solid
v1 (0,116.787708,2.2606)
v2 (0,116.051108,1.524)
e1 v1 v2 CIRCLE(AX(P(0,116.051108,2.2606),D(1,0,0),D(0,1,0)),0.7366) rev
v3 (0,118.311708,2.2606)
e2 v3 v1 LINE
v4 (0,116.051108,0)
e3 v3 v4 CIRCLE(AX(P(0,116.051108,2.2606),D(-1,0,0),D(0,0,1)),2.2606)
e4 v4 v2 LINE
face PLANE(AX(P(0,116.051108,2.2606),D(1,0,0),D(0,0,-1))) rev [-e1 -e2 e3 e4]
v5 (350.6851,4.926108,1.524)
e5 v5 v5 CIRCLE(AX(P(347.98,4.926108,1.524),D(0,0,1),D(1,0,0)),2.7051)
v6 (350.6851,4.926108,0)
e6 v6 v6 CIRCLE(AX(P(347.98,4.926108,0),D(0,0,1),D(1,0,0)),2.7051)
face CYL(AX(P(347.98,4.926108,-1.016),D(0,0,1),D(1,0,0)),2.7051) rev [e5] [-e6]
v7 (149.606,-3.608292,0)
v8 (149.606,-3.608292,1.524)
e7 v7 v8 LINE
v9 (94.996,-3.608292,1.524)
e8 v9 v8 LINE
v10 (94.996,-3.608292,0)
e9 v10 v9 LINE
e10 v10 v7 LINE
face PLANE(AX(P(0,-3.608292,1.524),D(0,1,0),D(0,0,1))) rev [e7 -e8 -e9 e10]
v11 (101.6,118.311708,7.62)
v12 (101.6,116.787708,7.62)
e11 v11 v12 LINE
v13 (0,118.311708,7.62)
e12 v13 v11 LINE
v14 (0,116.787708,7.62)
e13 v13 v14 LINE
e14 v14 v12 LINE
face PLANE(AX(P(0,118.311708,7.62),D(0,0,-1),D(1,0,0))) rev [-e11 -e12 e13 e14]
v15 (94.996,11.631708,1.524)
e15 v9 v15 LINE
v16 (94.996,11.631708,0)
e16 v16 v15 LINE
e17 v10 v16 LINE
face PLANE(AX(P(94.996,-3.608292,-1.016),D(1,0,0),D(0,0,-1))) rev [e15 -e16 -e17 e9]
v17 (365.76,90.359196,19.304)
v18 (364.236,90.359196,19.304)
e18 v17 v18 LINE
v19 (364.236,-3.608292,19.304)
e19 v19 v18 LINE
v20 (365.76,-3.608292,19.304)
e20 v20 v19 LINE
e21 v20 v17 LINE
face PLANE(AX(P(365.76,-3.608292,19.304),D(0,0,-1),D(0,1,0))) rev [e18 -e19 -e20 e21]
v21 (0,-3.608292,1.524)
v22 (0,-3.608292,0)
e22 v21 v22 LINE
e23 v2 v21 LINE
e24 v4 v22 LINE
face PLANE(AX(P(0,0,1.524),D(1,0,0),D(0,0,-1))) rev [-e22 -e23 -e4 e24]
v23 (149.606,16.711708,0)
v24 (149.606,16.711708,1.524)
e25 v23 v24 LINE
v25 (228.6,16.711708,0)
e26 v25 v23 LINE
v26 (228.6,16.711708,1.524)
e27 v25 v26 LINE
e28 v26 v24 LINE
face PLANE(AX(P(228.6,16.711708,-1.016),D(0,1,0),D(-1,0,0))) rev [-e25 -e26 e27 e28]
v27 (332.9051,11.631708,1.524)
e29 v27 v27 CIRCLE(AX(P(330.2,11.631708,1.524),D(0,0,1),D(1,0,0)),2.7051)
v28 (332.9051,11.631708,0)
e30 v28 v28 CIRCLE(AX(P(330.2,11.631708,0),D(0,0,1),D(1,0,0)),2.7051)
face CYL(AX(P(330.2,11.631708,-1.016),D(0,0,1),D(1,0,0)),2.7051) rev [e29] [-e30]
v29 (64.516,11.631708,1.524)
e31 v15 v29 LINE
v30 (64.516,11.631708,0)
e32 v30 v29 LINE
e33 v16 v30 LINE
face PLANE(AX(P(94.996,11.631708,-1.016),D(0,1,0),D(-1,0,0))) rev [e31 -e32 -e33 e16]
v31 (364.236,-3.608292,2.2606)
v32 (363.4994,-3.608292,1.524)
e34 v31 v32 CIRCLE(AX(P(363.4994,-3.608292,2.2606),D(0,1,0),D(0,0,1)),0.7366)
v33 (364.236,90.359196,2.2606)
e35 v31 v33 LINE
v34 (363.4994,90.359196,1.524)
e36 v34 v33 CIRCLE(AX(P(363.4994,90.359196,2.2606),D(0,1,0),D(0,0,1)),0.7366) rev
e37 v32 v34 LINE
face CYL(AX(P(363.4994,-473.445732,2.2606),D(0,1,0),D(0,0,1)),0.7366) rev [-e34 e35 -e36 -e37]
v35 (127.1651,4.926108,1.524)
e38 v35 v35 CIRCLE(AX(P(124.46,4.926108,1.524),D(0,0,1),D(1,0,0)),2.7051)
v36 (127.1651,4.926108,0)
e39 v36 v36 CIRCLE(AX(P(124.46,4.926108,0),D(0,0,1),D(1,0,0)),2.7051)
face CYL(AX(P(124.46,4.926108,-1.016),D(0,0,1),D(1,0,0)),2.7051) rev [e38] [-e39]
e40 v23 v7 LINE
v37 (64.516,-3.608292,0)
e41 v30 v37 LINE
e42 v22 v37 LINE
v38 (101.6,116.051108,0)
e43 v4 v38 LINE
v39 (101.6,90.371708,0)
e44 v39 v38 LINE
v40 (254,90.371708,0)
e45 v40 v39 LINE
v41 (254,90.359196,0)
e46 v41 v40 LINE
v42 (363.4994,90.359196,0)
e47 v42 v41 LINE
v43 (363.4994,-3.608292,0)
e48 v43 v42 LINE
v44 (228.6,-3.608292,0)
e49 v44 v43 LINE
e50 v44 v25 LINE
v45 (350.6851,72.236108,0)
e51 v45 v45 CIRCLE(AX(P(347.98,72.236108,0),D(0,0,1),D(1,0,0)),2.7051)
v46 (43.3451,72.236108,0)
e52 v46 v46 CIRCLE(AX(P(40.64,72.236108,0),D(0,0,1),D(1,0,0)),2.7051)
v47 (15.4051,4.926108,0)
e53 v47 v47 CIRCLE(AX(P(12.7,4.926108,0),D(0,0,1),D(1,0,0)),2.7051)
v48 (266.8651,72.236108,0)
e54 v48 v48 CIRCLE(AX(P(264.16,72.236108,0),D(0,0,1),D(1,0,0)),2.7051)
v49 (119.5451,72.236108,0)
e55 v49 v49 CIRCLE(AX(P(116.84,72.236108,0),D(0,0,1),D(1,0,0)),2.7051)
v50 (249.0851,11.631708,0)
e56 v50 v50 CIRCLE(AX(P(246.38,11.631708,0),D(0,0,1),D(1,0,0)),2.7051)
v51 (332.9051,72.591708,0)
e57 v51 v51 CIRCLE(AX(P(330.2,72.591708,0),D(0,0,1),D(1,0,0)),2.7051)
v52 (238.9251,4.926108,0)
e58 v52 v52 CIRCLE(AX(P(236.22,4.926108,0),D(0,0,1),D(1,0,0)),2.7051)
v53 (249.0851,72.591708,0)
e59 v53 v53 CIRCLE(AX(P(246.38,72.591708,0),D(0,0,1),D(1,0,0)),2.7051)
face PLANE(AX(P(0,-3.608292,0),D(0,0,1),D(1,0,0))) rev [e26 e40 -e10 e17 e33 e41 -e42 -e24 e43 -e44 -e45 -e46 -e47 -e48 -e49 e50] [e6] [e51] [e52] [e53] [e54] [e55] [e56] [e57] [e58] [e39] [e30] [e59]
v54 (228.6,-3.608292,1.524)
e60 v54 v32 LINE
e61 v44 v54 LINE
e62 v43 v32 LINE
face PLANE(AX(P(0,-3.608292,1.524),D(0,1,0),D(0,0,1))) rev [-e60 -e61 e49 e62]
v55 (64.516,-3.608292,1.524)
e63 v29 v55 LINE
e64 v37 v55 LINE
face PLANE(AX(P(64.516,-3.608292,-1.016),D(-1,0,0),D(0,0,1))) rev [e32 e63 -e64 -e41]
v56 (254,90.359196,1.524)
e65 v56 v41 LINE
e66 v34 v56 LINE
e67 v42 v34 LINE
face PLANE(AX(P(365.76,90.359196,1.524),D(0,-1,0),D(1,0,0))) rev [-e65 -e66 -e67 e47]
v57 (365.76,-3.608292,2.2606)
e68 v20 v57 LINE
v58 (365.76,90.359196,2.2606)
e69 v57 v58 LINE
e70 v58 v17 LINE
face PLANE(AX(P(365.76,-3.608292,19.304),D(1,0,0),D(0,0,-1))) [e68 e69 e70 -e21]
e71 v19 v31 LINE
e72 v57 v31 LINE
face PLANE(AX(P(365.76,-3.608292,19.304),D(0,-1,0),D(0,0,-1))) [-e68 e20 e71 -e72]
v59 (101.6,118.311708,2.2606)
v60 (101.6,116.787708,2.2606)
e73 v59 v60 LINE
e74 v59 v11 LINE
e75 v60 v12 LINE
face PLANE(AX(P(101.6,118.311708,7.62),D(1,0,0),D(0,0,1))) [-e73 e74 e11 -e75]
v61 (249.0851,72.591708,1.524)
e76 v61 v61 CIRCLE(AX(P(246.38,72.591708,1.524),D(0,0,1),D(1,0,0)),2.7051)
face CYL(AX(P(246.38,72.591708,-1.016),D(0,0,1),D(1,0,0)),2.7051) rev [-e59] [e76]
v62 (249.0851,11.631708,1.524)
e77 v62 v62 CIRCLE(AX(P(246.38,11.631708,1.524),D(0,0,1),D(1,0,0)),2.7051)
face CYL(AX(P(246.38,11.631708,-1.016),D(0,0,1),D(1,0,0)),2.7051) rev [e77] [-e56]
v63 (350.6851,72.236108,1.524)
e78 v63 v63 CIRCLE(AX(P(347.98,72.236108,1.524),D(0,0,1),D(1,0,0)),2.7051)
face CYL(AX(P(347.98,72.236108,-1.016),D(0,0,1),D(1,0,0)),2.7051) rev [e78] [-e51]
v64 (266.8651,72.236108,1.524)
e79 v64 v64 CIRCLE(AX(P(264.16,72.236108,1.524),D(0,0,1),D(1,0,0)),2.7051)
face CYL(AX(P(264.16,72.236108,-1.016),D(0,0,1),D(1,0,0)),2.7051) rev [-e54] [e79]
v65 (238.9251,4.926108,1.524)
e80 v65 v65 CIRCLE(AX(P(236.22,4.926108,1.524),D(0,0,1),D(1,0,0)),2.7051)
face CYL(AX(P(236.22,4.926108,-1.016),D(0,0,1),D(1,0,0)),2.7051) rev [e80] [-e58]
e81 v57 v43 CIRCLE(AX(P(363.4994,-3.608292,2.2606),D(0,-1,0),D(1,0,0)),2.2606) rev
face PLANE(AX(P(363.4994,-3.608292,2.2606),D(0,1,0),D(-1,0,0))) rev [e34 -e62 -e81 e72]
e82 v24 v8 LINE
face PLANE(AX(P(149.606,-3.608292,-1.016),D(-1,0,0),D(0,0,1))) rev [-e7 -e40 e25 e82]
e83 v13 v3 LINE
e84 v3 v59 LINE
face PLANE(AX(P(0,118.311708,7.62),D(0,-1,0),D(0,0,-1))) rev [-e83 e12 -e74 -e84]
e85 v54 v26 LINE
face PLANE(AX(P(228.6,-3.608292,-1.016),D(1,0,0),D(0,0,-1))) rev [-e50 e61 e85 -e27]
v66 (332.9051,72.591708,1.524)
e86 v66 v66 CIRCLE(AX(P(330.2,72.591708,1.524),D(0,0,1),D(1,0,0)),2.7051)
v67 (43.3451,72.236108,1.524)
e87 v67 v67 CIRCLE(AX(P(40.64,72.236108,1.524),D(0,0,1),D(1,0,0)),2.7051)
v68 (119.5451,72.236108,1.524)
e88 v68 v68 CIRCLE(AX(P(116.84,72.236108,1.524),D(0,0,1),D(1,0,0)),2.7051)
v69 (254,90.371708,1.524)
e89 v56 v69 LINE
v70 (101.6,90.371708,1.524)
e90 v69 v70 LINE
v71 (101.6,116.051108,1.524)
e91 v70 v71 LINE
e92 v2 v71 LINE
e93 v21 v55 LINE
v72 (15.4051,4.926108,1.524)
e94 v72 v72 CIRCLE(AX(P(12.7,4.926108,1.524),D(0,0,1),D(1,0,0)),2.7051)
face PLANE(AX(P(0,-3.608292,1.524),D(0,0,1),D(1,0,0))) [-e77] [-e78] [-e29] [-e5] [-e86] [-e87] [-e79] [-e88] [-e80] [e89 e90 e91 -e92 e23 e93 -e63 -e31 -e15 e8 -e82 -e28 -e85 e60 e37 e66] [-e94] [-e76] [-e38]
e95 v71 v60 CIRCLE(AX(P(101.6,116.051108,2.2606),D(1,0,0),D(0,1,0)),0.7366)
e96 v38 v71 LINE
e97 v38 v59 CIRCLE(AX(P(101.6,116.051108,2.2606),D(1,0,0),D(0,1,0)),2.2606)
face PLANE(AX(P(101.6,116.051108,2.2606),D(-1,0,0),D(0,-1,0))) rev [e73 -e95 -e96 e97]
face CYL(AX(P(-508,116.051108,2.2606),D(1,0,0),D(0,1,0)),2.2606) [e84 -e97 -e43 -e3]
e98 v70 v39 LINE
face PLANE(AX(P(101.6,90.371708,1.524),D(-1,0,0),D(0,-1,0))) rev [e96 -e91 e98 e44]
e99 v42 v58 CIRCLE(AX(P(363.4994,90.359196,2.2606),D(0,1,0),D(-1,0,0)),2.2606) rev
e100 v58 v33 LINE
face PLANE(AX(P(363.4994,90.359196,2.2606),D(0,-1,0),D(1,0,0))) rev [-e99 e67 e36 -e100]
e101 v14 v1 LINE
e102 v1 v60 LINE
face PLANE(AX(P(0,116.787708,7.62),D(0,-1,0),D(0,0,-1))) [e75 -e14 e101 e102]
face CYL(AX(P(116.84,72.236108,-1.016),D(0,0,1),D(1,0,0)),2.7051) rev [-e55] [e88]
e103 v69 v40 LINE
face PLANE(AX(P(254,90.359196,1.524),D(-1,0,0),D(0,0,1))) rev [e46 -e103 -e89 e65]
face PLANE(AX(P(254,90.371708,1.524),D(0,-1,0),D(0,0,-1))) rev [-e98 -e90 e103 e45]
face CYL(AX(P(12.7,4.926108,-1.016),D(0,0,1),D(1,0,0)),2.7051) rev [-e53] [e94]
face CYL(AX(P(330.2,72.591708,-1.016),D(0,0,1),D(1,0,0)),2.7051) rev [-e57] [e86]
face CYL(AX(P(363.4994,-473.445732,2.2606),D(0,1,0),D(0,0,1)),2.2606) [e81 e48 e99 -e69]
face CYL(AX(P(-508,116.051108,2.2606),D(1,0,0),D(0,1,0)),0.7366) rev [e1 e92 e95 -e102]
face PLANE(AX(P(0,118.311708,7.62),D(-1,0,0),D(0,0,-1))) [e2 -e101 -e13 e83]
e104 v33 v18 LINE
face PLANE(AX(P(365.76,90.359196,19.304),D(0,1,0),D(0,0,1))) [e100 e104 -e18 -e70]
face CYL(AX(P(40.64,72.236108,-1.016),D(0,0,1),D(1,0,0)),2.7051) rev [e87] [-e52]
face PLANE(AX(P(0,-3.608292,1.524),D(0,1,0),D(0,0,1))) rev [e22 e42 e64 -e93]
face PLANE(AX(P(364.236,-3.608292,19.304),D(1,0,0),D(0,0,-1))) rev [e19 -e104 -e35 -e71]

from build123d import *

# Parameters (mm, degrees)
BASE_FLANGE1_DEPTH    = 1.524
MITER_START           = -3.608291964
MITER_FLANGE1_DEPTH   = 93.967487941
MITER_FLANGE1_2_DEPTH = 93.967487941
MITER_FLANGE2_DEPTH   = 101.6
MITER_FLANGE2_2_DEPTH = 101.6
SKETCH6_R             = 2.7051
PCB_MOUNT_HOLES_DEPTH = 2.54
SKETCH7_W             = 78.994
SKETCH7_H             = 20.32
SKETCH7_W_2           = 30.48
SKETCH7_H_2           = 15.24
CUT_EXTRUDE2_DEPTH    = 2.54
SKETCH8_R             = 2.7051
CUT_EXTRUDE3_DEPTH    = 2.54
LPATTERN1_COUNT       = 2
LPATTERN1_PITCH       = 83.82
LPATTERN1_COUNT_DIR2  = 2
LPATTERN1_PITCH_DIR2  = 60.96


# Read off the part's stored shape, not the designer's step: Miter Flange1, Miter Flange2
# Sheet-metal steps are written as plain solids
with BuildPart() as part:
    # Sketch1 → Base-Flange1 (new body)
    with BuildSketch(Plane.XY):
        Polygon((0, 0), (0, -3.608291964), (365.76, -3.608291964), (365.76, 90.359195977), (254, 90.359195977), (254, 90.371708036), (101.6, 90.371708036), (101.6, 118.311708036), (0, 118.311708036), align=None)
    extrude(amount=BASE_FLANGE1_DEPTH)

    # Miter Flange1 outline → Miter Flange1 (cut)
    with BuildSketch(Plane(origin=(0, 0, 0), x_dir=(1, 0, 0), z_dir=(0, 1, 0)).offset(MITER_START)):
        with BuildLine():
            ThreePointArc((363.4994, 0), (364.811869886, -0.420019885), (365.636625492, -1.524))
            Line((365.636625492, -1.524), (365.76, -1.524))
            Line((365.76, -1.524), (365.76, 0))
            Line((365.76, 0), (363.4994, 0))
        make_face()
    extrude(amount=MITER_FLANGE1_DEPTH, mode=Mode.SUBTRACT)

    # Miter Flange1 2 outline → Miter Flange1 2 (add)
    with BuildSketch(Plane(origin=(0, 0, 0), x_dir=(1, 0, 0), z_dir=(0, 1, 0)).offset(MITER_START)):
        with BuildLine():
            Line((364.236, -19.304), (365.76, -19.304))
            Line((365.76, -19.304), (365.76, -2.2606))
            ThreePointArc((365.76, -2.2606), (365.728943037, -1.887169675), (365.636625492, -1.524))
            Line((365.636625492, -1.524), (363.4994, -1.524))
            ThreePointArc((363.4994, -1.524), (364.020254855, -1.739745145), (364.236, -2.2606))
            Line((364.236, -2.2606), (364.236, -19.304))
        make_face()
    extrude(amount=MITER_FLANGE1_2_DEPTH)

    # Miter Flange2 outline → Miter Flange2 (cut)
    with BuildSketch(Plane.YZ):
        with BuildLine():
            Line((118.311708036, 1.524), (118.188333528, 1.524))
            ThreePointArc((118.188333528, 1.524), (117.363577922, 0.420019885), (116.051108036, 0))
            Line((116.051108036, 0), (118.311708036, 0))
            Line((118.311708036, 0), (118.311708036, 1.524))
        make_face()
    extrude(amount=MITER_FLANGE2_DEPTH, mode=Mode.SUBTRACT)

    # Miter Flange2 2 outline → Miter Flange2 2 (add)
    with BuildSketch(Plane.YZ):
        with BuildLine():
            Line((118.311708036, 7.62), (116.787708036, 7.62))
            Line((116.787708036, 7.62), (116.787708036, 2.2606))
            ThreePointArc((116.787708036, 2.2606), (116.571962891, 1.739745145), (116.051108036, 1.524))
            Line((116.051108036, 1.524), (118.188333528, 1.524))
            ThreePointArc((118.188333528, 1.524), (118.280651073, 1.887169675), (118.311708036, 2.2606))
            Line((118.311708036, 2.2606), (118.311708036, 7.62))
        make_face()
    extrude(amount=MITER_FLANGE2_2_DEPTH)

    # Sketch6 → PCB mount holes (cut)
    with BuildSketch(Plane.XY.offset(1.524)):
        with Locations((347.98, 4.926108036)):
            Circle(SKETCH6_R)
        with Locations((347.98, 72.236108036)):
            Circle(SKETCH6_R)
        with Locations((264.16, 72.236108036)):
            Circle(SKETCH6_R)
        with Locations((236.22, 4.926108036)):
            Circle(SKETCH6_R)
        with Locations((12.7, 4.926108036)):
            Circle(SKETCH6_R)
        with Locations((40.64, 72.236108036)):
            Circle(SKETCH6_R)
        with Locations((116.84, 72.236108036)):
            Circle(SKETCH6_R)
        with Locations((124.46, 4.926108036)):
            Circle(SKETCH6_R)
    extrude(amount=-PCB_MOUNT_HOLES_DEPTH, mode=Mode.SUBTRACT)

    # Sketch7 → Cut-Extrude2 (cut)
    with BuildSketch(Plane.XY.offset(1.524)):
        with Locations((189.103, 6.551708036)):
            Rectangle(SKETCH7_W, SKETCH7_H)
        with Locations((79.756, 4.011708036)):
            Rectangle(SKETCH7_W_2, SKETCH7_H_2)
    extrude(amount=-CUT_EXTRUDE2_DEPTH, mode=Mode.SUBTRACT)

    # Sketch8 → Cut-Extrude3 (cut)
    with BuildSketch(Plane.XY.offset(1.524)):
        with Locations((330.2, 11.631708036)):
            Circle(SKETCH8_R)
    cut_extrude3 = extrude(amount=-CUT_EXTRUDE3_DEPTH, mode=Mode.SUBTRACT)

    # LPattern1: Cut-Extrude3 2 × 2
    with Locations(*[(-i * LPATTERN1_PITCH, j * LPATTERN1_PITCH_DIR2, 0) for i in range(LPATTERN1_COUNT) for j in range(LPATTERN1_COUNT_DIR2) if (i, j) != (0, 0)]):
        add(cut_extrude3, mode=Mode.SUBTRACT)


solid = part.part
